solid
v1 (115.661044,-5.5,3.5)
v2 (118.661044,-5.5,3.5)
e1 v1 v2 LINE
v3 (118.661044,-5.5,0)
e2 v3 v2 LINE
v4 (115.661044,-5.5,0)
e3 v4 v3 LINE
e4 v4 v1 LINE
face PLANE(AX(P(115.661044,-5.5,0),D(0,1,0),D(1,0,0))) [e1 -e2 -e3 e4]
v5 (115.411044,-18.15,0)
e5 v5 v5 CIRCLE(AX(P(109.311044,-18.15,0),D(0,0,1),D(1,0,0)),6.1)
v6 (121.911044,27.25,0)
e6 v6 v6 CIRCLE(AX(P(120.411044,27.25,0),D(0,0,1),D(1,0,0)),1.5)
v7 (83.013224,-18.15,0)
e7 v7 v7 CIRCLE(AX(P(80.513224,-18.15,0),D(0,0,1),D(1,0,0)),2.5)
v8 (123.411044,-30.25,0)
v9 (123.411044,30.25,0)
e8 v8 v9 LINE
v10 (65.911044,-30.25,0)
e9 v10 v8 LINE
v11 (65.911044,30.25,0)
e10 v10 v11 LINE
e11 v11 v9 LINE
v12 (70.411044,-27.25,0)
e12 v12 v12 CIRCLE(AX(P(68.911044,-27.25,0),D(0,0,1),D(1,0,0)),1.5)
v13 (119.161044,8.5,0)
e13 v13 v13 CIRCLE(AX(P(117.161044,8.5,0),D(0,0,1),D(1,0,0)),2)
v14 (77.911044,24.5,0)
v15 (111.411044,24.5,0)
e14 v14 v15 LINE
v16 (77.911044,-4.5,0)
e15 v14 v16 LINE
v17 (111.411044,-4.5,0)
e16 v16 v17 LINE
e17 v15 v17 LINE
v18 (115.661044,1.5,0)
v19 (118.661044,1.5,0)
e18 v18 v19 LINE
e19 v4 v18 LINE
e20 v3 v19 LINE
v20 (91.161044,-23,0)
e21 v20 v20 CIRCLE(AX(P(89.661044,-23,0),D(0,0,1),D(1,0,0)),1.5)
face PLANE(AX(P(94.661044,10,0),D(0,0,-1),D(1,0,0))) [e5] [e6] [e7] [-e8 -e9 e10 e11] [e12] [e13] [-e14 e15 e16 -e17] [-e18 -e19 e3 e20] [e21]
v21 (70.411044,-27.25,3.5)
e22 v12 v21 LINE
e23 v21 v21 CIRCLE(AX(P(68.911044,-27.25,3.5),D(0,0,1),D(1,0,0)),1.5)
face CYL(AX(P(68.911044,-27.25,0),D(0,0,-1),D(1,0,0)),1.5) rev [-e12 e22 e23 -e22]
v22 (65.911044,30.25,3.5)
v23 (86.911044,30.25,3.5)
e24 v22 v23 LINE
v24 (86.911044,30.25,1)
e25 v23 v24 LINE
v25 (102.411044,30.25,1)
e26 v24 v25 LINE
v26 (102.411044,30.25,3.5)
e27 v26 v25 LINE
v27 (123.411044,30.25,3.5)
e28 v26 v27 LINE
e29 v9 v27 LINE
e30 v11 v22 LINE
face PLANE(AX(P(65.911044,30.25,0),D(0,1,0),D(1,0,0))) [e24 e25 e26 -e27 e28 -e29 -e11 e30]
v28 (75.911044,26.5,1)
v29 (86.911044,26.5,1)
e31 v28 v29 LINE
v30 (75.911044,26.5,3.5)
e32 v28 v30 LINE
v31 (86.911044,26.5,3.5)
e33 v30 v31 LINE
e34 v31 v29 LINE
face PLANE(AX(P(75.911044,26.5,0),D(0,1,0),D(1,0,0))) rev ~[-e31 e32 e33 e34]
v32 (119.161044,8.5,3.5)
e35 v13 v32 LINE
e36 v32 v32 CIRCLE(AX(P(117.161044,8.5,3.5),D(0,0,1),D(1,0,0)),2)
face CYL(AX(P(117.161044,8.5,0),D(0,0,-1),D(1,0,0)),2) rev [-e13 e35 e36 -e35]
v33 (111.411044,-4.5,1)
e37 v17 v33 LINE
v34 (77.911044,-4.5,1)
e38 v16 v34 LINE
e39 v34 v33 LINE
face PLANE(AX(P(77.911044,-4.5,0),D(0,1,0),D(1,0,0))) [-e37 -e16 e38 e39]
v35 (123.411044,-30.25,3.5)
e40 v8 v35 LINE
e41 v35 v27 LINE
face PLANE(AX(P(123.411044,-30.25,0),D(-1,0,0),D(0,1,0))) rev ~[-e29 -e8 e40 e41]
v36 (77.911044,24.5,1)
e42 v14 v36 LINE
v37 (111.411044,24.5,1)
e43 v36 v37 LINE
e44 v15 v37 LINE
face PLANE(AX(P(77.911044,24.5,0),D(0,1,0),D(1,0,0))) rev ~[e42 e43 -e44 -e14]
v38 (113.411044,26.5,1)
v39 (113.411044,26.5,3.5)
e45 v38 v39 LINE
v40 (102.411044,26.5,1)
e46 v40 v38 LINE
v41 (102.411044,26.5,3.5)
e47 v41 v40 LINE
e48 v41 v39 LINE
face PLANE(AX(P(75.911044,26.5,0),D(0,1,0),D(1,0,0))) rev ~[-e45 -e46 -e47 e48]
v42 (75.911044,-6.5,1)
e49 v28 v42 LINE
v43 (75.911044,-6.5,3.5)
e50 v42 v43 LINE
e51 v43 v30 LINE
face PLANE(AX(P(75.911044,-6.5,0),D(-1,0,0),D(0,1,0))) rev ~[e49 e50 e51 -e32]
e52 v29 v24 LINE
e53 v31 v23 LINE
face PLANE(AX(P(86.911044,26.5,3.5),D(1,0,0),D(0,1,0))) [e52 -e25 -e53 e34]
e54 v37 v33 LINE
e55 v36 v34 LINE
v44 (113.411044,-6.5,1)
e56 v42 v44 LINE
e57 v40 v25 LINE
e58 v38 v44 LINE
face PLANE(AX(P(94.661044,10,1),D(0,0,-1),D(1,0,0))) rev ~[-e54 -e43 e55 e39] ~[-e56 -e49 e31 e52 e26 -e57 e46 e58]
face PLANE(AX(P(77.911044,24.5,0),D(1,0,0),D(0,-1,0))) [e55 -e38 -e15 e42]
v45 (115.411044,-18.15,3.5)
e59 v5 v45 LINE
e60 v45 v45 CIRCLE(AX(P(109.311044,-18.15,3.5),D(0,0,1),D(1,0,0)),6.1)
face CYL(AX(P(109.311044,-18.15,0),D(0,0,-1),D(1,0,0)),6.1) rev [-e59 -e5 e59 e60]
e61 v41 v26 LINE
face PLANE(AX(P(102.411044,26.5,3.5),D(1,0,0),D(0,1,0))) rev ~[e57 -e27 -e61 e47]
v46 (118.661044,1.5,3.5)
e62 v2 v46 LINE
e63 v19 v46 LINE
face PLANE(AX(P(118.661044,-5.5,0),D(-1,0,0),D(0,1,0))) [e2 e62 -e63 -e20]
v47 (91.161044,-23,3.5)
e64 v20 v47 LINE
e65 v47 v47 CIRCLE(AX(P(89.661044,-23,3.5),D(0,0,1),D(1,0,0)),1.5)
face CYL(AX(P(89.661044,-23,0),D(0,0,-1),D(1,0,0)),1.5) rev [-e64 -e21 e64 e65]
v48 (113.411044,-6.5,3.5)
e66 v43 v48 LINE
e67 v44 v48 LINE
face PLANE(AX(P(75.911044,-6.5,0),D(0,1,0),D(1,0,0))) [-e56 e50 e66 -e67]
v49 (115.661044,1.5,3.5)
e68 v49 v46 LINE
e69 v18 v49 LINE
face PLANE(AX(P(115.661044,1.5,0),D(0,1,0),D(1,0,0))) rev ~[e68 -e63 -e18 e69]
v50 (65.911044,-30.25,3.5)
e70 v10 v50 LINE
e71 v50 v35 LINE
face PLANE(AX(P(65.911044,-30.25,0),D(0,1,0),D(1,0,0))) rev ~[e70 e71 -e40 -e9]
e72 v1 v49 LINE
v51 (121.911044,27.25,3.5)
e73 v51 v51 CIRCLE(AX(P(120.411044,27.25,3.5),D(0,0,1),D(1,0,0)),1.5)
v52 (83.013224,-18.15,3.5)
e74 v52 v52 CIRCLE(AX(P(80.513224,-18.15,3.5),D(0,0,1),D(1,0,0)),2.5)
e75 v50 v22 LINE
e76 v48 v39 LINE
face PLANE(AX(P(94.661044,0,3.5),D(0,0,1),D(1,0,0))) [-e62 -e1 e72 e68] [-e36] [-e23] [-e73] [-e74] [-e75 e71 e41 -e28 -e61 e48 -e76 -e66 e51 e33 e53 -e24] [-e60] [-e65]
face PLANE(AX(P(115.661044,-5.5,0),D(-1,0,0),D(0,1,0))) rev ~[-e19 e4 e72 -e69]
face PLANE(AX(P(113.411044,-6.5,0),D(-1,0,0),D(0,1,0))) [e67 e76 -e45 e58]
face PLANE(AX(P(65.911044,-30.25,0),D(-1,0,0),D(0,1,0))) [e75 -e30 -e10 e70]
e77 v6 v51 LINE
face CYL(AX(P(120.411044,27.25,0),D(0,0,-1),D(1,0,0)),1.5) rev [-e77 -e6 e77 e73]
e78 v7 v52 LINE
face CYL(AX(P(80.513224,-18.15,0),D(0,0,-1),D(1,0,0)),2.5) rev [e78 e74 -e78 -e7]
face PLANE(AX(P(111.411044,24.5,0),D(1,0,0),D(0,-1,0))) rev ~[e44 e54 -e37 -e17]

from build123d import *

# Parameters (mm, degrees)
F0_W     = 57.5
F0_H     = 60.5
F0_R     = 1.5
F0_R_2   = 2.5
F0_R_3   = 6.1
F0_W_2   = 3
F0_H_2   = 7
F0_W_3   = 37.5
F0_H_3   = 33
F0_R_4   = 2
F1_DEPTH = 3.5
F3_W     = 37.5
F3_H     = 33
F3_W_2   = 33.5
F3_H_2   = 29
F4_DEPTH = 1
F2_W     = 15.5
F2_H     = 3.75
F5_DEPTH = 2.5


with BuildPart() as f1:
    # F0 (on Top) → F1 (new body)
    with BuildSketch(Plane.XY):
        with Locations((94.6610440163, 0)):
            Rectangle(F0_W, F0_H)
        with Locations((68.9110440163, -27.25)):
            Circle(F0_R, mode=Mode.SUBTRACT)
        with Locations((89.6610440163, -23)):
            Circle(F0_R, mode=Mode.SUBTRACT)
        with Locations((80.5132240057, -18.15)):
            Circle(F0_R_2, mode=Mode.SUBTRACT)
        with Locations((109.3110440163, -18.15)):
            Circle(F0_R_3, mode=Mode.SUBTRACT)
        with Locations((117.1610440163, -2)):
            Rectangle(F0_W_2, F0_H_2, mode=Mode.SUBTRACT)
        with Locations((94.6610440163, 10)):
            Rectangle(F0_W_3, F0_H_3, mode=Mode.SUBTRACT)
        with Locations((117.1610440163, 8.5)):
            Circle(F0_R_4, mode=Mode.SUBTRACT)
        with Locations((120.4110440163, 27.25)):
            Circle(F0_R, mode=Mode.SUBTRACT)
    extrude(amount=F1_DEPTH)

    # F3 (on face) → F4 (join)
    with BuildSketch(Plane(origin=(0, 0, 0), x_dir=(1, 0, 0), z_dir=(0, 0, -1))):
        with Locations((94.6610440163, -10)):
            Rectangle(F3_W, F3_H)
        with Locations((94.6610440163, -10)):
            Rectangle(F3_W_2, F3_H_2, mode=Mode.SUBTRACT)
    extrude(amount=-F4_DEPTH)

    # F2 (on face) → F5 (cut)
    with BuildSketch(Plane.XY.offset(3.5)):
        with Locations((94.6610440163, 28.375)):
            Rectangle(F2_W, F2_H)
    extrude(amount=-F5_DEPTH, mode=Mode.SUBTRACT)


solid = f1.part
